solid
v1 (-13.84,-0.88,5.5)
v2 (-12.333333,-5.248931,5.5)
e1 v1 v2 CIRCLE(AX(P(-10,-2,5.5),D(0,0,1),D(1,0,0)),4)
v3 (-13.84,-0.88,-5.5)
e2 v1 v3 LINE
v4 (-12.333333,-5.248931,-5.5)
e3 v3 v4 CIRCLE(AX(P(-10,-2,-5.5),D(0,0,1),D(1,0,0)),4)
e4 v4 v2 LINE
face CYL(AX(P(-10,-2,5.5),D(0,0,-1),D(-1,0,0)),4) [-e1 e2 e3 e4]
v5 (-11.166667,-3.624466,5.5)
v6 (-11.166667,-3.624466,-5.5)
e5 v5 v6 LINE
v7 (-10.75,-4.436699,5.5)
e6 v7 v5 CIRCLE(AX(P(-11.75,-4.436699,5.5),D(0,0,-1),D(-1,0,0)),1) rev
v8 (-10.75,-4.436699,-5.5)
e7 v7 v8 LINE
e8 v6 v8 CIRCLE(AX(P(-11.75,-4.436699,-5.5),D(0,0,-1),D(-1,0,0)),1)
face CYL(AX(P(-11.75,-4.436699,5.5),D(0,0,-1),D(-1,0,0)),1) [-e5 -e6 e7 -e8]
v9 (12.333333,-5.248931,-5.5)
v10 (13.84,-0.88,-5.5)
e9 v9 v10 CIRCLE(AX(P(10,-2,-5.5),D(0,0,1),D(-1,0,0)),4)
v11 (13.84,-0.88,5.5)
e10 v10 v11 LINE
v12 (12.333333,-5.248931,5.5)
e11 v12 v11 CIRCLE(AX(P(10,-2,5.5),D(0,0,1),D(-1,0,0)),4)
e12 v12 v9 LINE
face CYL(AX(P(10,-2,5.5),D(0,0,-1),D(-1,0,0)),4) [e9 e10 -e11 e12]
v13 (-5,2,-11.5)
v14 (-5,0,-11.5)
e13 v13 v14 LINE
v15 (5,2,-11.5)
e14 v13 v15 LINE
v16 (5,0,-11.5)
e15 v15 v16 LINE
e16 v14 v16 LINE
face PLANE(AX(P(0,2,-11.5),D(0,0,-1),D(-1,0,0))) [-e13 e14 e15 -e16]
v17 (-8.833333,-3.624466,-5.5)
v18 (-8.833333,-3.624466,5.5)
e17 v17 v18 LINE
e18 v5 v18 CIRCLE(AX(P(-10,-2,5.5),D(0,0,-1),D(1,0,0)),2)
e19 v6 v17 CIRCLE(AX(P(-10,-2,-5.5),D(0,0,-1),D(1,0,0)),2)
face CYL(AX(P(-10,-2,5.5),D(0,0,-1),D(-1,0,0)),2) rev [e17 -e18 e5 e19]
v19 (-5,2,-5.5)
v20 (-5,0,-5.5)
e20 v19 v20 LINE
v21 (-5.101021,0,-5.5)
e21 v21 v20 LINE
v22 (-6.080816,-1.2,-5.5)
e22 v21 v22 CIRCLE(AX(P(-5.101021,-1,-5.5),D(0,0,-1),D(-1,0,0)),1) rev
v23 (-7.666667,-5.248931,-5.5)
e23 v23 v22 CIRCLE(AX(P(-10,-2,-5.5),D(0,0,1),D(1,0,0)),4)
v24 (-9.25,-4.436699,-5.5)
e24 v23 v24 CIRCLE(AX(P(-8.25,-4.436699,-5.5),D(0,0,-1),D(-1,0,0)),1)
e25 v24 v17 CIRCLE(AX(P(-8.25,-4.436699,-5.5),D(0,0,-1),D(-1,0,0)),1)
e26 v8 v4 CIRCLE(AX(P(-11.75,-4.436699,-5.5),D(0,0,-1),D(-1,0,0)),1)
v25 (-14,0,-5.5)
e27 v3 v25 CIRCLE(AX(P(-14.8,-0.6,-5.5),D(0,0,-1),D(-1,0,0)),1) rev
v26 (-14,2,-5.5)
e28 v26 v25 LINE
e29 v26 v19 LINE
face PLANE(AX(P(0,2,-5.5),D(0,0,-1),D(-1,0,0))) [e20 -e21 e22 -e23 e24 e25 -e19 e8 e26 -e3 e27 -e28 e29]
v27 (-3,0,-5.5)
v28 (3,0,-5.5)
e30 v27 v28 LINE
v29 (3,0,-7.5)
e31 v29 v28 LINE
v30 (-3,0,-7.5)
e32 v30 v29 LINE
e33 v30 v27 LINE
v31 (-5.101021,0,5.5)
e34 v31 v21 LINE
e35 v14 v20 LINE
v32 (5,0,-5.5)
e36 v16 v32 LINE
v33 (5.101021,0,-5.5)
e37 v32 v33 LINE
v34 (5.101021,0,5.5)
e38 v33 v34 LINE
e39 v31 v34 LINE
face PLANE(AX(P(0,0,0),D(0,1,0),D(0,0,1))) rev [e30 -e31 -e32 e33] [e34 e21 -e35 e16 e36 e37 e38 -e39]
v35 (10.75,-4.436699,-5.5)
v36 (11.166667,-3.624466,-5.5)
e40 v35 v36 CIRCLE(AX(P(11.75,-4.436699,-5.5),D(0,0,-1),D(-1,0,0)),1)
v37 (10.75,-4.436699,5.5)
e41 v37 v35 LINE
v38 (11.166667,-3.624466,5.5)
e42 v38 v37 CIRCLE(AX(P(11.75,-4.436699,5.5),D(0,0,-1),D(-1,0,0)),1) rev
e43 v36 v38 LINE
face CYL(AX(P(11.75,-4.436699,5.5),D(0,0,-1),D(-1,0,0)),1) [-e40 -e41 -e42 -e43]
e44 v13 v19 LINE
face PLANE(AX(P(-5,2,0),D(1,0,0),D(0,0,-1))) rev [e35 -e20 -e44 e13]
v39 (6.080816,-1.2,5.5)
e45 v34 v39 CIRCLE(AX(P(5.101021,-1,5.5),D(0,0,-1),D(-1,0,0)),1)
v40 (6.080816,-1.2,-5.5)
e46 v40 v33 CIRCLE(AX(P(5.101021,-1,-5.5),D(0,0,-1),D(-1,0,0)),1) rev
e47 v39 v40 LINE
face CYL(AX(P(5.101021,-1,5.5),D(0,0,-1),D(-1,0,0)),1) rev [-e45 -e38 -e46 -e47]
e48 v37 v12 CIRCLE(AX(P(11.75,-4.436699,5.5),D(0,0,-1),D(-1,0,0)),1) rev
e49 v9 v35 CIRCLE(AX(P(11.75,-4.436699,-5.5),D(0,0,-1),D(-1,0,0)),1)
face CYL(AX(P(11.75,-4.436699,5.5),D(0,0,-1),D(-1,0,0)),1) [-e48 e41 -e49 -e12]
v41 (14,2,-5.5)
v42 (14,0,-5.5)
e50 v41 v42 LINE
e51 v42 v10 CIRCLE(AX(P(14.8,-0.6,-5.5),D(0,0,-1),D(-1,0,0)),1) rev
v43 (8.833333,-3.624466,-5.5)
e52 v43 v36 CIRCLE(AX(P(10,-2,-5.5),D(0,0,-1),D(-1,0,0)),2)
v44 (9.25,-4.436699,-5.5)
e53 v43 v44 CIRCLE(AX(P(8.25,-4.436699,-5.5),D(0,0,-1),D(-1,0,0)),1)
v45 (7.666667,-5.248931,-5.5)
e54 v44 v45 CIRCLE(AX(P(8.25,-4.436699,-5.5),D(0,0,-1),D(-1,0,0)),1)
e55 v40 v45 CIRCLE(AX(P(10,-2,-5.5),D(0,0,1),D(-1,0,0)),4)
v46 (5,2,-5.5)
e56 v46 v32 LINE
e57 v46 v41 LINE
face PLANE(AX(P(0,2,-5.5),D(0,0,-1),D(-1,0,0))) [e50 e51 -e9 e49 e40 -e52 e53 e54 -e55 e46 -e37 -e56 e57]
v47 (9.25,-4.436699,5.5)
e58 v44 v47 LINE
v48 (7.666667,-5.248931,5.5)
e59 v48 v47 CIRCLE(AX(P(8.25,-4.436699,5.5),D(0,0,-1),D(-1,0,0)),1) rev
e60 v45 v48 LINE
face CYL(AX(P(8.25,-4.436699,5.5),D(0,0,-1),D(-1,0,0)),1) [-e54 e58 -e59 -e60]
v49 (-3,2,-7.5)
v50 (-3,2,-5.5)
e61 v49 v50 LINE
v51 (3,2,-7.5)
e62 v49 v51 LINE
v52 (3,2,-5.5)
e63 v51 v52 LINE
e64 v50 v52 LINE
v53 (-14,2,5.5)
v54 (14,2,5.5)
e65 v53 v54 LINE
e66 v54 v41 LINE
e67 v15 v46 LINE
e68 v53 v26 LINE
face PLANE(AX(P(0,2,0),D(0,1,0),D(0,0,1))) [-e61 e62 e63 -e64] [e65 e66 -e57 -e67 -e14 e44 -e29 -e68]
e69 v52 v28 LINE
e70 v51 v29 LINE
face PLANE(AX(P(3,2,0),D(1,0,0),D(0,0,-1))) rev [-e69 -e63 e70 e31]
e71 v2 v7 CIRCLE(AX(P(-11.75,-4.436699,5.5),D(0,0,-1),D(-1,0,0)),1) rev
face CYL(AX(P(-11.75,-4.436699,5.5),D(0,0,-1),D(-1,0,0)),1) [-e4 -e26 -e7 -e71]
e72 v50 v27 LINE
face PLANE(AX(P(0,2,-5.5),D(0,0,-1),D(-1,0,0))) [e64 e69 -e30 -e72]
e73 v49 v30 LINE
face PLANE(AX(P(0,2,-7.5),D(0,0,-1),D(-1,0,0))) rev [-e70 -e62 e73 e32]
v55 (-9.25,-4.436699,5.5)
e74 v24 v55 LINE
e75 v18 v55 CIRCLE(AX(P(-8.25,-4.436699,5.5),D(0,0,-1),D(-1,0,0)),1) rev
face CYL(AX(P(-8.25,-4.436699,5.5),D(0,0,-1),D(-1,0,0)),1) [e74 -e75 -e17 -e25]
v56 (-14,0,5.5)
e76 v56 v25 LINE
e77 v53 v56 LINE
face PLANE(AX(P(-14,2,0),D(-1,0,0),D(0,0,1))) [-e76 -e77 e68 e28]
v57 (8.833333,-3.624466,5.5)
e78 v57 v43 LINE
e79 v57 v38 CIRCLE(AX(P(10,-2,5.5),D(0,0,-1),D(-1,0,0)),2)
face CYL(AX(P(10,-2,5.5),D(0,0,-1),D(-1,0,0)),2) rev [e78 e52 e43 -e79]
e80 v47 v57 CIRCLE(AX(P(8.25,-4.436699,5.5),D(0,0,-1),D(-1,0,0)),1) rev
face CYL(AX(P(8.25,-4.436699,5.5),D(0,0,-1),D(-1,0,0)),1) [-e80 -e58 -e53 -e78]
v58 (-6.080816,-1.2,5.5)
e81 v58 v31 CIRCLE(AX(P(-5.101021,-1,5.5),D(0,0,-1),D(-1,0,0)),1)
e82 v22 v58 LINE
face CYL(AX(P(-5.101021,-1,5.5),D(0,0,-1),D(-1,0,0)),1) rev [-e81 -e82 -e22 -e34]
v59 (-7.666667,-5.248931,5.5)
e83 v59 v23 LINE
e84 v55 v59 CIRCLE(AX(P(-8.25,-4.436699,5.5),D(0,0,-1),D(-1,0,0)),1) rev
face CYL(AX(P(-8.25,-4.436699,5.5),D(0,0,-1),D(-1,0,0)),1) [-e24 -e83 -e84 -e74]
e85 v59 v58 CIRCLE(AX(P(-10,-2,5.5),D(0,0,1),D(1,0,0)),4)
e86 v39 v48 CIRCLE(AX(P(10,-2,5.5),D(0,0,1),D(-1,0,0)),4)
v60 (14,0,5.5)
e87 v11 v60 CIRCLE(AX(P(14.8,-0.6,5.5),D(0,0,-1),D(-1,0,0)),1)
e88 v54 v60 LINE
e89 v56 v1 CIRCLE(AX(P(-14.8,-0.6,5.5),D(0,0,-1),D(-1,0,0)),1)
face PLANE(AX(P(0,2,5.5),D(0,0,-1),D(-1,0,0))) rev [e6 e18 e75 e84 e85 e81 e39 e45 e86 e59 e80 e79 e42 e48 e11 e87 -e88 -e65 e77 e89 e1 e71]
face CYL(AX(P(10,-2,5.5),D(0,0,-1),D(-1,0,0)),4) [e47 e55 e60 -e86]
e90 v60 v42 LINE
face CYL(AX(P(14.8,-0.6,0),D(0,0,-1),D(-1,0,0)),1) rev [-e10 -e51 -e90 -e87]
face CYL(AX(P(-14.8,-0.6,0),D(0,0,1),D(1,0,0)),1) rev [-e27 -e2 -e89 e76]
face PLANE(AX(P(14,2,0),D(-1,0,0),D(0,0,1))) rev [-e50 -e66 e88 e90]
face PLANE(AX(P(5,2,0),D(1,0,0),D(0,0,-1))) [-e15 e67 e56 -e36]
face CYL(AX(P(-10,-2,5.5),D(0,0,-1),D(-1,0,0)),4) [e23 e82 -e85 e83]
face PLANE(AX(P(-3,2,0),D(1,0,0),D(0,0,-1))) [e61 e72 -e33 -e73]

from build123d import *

# Parameters (mm, degrees)
SKETCH1_W           = 6
SKETCH1_H           = 2
BOSS_EXTRUDE1_DEPTH = 2
BOSS_EXTRUDE2_DEPTH = 5.5
FILLET1_R           = 1


with BuildPart() as part:
    # Sketch1 → Boss-Extrude1 (new body)
    with BuildSketch(Plane(origin=(0, 0, 0), x_dir=(1, 0, 0), z_dir=(0, 1, 0))):
        Polygon((-14, 5.5), (-14, -5.5), (14, -5.5), (14, 5.5), (5, 5.5), (5, 11.5), (-5, 11.5), (-5, 5.5), align=None)
        with Locations((0, 6.5)):
            Rectangle(SKETCH1_W, SKETCH1_H, mode=Mode.SUBTRACT)
    extrude(amount=BOSS_EXTRUDE1_DEPTH)

    # Sketch2 → Boss-Extrude2 (add, symmetric)
    with BuildSketch(Plane.XY):
        with BuildLine():
            Line((-10.75, -5.929058411), (-10.75, -3.854049622))
            ThreePointArc((-10.75, -3.854049622), (-10, 0), (-9.25, -3.854049622))
            Line((-9.25, -3.854049622), (-9.25, -5.929058411))
            ThreePointArc((-9.25, -5.929058411), (-10, 2), (-10.75, -5.929058411))
        make_face()
        with BuildLine():
            Line((9.25, -5.929058411), (9.25, -3.854049622))
            ThreePointArc((9.25, -3.854049622), (10, 0), (10.75, -3.854049622))
            Line((10.75, -3.854049622), (10.75, -5.929058411))
            ThreePointArc((10.75, -5.929058411), (10, 2), (9.25, -5.929058411))
        make_face()
    extrude(amount=BOSS_EXTRUDE2_DEPTH, both=True)

    # Fillet1
    # the kernel refuses this fillet: 1 mm, written as the material it adds along each edge
    with BuildSketch(Plane(origin=(-6.535898385, 0, -5.5), x_dir=(0.3545926272330996, -0.9350208921259076, 0), z_dir=(0, 0, 1))) as fillet1_piece_1:
        with BuildLine():
            CenterArc((1.443818006, 0.987048159), FILLET1_R, 159.231520484, 101.536959033)
            Line((0.508797114, 1.341640786), (0, 0))
            ThreePointArc((0, 0), (0.641696892, 0.051807363), (1.283393783, 0))
        make_face()
    extrude(amount=11)
    with BuildSketch(Plane(origin=(-13.464101615, 0, -5.5), x_dir=(-1, 0, 0), z_dir=(0, 0, 1))) as fillet1_piece_2:
        with BuildLine():
            CenterArc((1.335898385, 0.6), FILLET1_R, 163.739795292, 53.130102354)
            ThreePointArc((0.375898385, 0.88), (0.214359354, 0.428718708), (0, 0))
            Line((0, 0), (0.535898385, 0))
        make_face()
    extrude(amount=11)
    with BuildSketch(Plane(origin=(13.464101615, 0, -5.5), x_dir=(1, 0, 0), z_dir=(0, 0, 1))) as fillet1_piece_3:
        with BuildLine():
            CenterArc((1.335898385, -0.6), FILLET1_R, 143.130102354, 53.130102354)
            ThreePointArc((0.375898385, -0.88), (0.214359354, -0.428718708), (0, 0))
            Line((0, 0), (0.535898385, 0))
        make_face()
    extrude(amount=11)
    with BuildSketch(Plane(origin=(6.535898385, 0, -5.5), x_dir=(-0.3545926272330986, -0.935020892125908, 0), z_dir=(0, 0, 1))) as fillet1_piece_4:
        with BuildLine():
            CenterArc((1.443818006, -0.987048159), FILLET1_R, 99.231520484, 101.536959033)
            Line((0.508797114, -1.341640786), (0, 0))
            ThreePointArc((0, 0), (0.641696892, -0.051807363), (1.283393783, 0))
        make_face()
    extrude(amount=11)
    # the kernel refuses this fillet: 1 mm, written as the material it takes off along each edge
    with BuildSketch(Plane(origin=(10.75, -5.929058411, 9.808071734), x_dir=(0, 1, 0), z_dir=(0, 0, -1))) as fillet1_2_piece_1:
        with BuildLine():
            CenterArc((1.492359825, 1), FILLET1_R, 144.314665287, 125.685334713)
            ThreePointArc((0.680126963, 1.583333333), (0.253786895, 0.828727108), (0, 0))
            Line((0, 0), (1.492359825, 0))
        make_face()
    extrude(amount=19.616143468, mode=Mode.SUBTRACT)
    with BuildSketch(Plane(origin=(10.75, -3.854049622, -6.956622411), x_dir=(0.8758453103585752, 0.48259195219449225, 0), z_dir=(0, 0, 1))) as fillet1_2_piece_2:
        with BuildLine():
            CenterArc((0.594663609, -0.992902315), FILLET1_R, 96.830510938, 54.314665287)
            Line((-0.281181701, -0.510310363), (0, 0))
            ThreePointArc((0, 0), (0.237865444, -0.014195369), (0.475730887, 0))
        make_face()
    extrude(amount=13.913244822, mode=Mode.SUBTRACT)
    with BuildSketch(Plane(origin=(9.25, -5.929058411, 9.808071734), x_dir=(-0.9188178790368026, 0.39468177708416147, 0), z_dir=(0, 0, -1))) as fillet1_2_piece_3:
        with BuildLine():
            CenterArc((1.507825107, 0.976525112), FILLET1_R, 156.753871206, 125.685334713)
            Line((0.589007228, 1.371206889), (0, 0))
            ThreePointArc((0, 0), (0.861614347, -0.093899551), (1.723228694, 0))
        make_face()
    extrude(amount=19.616143468, mode=Mode.SUBTRACT)
    with BuildSketch(Plane(origin=(9.25, -3.854049622, -6.956622411), x_dir=(0, -1, 0), z_dir=(0, 0, 1))) as fillet1_2_piece_4:
        with BuildLine():
            CenterArc((0.582648964, -1), FILLET1_R, 90, 54.314665287)
            ThreePointArc((-0.229583898, -0.416666667), (-0.102359001, -0.215183904), (0, 0))
            Line((0, 0), (0.582648964, 0))
        make_face()
    extrude(amount=13.913244822, mode=Mode.SUBTRACT)
    with BuildSketch(Plane(origin=(-9.25, -3.854049622, -6.956622411), x_dir=(0, -1, 0), z_dir=(0, 0, 1))) as fillet1_2_piece_5:
        with BuildLine():
            CenterArc((0.582648964, 1), FILLET1_R, 215.685334713, 54.314665287)
            ThreePointArc((-0.229583898, 0.416666667), (-0.102359001, 0.215183904), (0, 0))
            Line((0, 0), (0.582648964, 0))
        make_face()
    extrude(amount=13.913244822, mode=Mode.SUBTRACT)
    with BuildSketch(Plane(origin=(-10.75, -3.854049622, -6.956622411), x_dir=(-0.8758453103585743, 0.4825919521944938, 0), z_dir=(0, 0, 1))) as fillet1_2_piece_6:
        with BuildLine():
            CenterArc((0.594663609, 0.992902315), FILLET1_R, 208.854823775, 54.314665287)
            Line((-0.281181701, 0.510310363), (0, 0))
            ThreePointArc((0, 0), (0.237865444, 0.014195369), (0.475730887, 0))
        make_face()
    extrude(amount=13.913244822, mode=Mode.SUBTRACT)
    with BuildSketch(Plane(origin=(-9.25, -5.929058411, 9.808071734), x_dir=(0.9188178790368028, 0.3946817770841608, 0), z_dir=(0, 0, -1))) as fillet1_2_piece_7:
        with BuildLine():
            CenterArc((1.507825107, -0.976525112), FILLET1_R, 77.560794081, 125.685334713)
            Line((0.589007228, -1.371206889), (0, 0))
            ThreePointArc((0, 0), (0.861614347, 0.093899551), (1.723228694, 0))
        make_face()
    extrude(amount=19.616143468, mode=Mode.SUBTRACT)
    with BuildSketch(Plane(origin=(-10.75, -5.929058411, 9.808071734), x_dir=(0, 1, 0), z_dir=(0, 0, -1))) as fillet1_2_piece_8:
        with BuildLine():
            CenterArc((1.492359825, -1), FILLET1_R, 90, 125.685334713)
            ThreePointArc((0.680126963, -1.583333333), (0.253786895, -0.828727108), (0, 0))
            Line((0, 0), (1.492359825, 0))
        make_face()
    extrude(amount=19.616143468, mode=Mode.SUBTRACT)


solid = part.part
